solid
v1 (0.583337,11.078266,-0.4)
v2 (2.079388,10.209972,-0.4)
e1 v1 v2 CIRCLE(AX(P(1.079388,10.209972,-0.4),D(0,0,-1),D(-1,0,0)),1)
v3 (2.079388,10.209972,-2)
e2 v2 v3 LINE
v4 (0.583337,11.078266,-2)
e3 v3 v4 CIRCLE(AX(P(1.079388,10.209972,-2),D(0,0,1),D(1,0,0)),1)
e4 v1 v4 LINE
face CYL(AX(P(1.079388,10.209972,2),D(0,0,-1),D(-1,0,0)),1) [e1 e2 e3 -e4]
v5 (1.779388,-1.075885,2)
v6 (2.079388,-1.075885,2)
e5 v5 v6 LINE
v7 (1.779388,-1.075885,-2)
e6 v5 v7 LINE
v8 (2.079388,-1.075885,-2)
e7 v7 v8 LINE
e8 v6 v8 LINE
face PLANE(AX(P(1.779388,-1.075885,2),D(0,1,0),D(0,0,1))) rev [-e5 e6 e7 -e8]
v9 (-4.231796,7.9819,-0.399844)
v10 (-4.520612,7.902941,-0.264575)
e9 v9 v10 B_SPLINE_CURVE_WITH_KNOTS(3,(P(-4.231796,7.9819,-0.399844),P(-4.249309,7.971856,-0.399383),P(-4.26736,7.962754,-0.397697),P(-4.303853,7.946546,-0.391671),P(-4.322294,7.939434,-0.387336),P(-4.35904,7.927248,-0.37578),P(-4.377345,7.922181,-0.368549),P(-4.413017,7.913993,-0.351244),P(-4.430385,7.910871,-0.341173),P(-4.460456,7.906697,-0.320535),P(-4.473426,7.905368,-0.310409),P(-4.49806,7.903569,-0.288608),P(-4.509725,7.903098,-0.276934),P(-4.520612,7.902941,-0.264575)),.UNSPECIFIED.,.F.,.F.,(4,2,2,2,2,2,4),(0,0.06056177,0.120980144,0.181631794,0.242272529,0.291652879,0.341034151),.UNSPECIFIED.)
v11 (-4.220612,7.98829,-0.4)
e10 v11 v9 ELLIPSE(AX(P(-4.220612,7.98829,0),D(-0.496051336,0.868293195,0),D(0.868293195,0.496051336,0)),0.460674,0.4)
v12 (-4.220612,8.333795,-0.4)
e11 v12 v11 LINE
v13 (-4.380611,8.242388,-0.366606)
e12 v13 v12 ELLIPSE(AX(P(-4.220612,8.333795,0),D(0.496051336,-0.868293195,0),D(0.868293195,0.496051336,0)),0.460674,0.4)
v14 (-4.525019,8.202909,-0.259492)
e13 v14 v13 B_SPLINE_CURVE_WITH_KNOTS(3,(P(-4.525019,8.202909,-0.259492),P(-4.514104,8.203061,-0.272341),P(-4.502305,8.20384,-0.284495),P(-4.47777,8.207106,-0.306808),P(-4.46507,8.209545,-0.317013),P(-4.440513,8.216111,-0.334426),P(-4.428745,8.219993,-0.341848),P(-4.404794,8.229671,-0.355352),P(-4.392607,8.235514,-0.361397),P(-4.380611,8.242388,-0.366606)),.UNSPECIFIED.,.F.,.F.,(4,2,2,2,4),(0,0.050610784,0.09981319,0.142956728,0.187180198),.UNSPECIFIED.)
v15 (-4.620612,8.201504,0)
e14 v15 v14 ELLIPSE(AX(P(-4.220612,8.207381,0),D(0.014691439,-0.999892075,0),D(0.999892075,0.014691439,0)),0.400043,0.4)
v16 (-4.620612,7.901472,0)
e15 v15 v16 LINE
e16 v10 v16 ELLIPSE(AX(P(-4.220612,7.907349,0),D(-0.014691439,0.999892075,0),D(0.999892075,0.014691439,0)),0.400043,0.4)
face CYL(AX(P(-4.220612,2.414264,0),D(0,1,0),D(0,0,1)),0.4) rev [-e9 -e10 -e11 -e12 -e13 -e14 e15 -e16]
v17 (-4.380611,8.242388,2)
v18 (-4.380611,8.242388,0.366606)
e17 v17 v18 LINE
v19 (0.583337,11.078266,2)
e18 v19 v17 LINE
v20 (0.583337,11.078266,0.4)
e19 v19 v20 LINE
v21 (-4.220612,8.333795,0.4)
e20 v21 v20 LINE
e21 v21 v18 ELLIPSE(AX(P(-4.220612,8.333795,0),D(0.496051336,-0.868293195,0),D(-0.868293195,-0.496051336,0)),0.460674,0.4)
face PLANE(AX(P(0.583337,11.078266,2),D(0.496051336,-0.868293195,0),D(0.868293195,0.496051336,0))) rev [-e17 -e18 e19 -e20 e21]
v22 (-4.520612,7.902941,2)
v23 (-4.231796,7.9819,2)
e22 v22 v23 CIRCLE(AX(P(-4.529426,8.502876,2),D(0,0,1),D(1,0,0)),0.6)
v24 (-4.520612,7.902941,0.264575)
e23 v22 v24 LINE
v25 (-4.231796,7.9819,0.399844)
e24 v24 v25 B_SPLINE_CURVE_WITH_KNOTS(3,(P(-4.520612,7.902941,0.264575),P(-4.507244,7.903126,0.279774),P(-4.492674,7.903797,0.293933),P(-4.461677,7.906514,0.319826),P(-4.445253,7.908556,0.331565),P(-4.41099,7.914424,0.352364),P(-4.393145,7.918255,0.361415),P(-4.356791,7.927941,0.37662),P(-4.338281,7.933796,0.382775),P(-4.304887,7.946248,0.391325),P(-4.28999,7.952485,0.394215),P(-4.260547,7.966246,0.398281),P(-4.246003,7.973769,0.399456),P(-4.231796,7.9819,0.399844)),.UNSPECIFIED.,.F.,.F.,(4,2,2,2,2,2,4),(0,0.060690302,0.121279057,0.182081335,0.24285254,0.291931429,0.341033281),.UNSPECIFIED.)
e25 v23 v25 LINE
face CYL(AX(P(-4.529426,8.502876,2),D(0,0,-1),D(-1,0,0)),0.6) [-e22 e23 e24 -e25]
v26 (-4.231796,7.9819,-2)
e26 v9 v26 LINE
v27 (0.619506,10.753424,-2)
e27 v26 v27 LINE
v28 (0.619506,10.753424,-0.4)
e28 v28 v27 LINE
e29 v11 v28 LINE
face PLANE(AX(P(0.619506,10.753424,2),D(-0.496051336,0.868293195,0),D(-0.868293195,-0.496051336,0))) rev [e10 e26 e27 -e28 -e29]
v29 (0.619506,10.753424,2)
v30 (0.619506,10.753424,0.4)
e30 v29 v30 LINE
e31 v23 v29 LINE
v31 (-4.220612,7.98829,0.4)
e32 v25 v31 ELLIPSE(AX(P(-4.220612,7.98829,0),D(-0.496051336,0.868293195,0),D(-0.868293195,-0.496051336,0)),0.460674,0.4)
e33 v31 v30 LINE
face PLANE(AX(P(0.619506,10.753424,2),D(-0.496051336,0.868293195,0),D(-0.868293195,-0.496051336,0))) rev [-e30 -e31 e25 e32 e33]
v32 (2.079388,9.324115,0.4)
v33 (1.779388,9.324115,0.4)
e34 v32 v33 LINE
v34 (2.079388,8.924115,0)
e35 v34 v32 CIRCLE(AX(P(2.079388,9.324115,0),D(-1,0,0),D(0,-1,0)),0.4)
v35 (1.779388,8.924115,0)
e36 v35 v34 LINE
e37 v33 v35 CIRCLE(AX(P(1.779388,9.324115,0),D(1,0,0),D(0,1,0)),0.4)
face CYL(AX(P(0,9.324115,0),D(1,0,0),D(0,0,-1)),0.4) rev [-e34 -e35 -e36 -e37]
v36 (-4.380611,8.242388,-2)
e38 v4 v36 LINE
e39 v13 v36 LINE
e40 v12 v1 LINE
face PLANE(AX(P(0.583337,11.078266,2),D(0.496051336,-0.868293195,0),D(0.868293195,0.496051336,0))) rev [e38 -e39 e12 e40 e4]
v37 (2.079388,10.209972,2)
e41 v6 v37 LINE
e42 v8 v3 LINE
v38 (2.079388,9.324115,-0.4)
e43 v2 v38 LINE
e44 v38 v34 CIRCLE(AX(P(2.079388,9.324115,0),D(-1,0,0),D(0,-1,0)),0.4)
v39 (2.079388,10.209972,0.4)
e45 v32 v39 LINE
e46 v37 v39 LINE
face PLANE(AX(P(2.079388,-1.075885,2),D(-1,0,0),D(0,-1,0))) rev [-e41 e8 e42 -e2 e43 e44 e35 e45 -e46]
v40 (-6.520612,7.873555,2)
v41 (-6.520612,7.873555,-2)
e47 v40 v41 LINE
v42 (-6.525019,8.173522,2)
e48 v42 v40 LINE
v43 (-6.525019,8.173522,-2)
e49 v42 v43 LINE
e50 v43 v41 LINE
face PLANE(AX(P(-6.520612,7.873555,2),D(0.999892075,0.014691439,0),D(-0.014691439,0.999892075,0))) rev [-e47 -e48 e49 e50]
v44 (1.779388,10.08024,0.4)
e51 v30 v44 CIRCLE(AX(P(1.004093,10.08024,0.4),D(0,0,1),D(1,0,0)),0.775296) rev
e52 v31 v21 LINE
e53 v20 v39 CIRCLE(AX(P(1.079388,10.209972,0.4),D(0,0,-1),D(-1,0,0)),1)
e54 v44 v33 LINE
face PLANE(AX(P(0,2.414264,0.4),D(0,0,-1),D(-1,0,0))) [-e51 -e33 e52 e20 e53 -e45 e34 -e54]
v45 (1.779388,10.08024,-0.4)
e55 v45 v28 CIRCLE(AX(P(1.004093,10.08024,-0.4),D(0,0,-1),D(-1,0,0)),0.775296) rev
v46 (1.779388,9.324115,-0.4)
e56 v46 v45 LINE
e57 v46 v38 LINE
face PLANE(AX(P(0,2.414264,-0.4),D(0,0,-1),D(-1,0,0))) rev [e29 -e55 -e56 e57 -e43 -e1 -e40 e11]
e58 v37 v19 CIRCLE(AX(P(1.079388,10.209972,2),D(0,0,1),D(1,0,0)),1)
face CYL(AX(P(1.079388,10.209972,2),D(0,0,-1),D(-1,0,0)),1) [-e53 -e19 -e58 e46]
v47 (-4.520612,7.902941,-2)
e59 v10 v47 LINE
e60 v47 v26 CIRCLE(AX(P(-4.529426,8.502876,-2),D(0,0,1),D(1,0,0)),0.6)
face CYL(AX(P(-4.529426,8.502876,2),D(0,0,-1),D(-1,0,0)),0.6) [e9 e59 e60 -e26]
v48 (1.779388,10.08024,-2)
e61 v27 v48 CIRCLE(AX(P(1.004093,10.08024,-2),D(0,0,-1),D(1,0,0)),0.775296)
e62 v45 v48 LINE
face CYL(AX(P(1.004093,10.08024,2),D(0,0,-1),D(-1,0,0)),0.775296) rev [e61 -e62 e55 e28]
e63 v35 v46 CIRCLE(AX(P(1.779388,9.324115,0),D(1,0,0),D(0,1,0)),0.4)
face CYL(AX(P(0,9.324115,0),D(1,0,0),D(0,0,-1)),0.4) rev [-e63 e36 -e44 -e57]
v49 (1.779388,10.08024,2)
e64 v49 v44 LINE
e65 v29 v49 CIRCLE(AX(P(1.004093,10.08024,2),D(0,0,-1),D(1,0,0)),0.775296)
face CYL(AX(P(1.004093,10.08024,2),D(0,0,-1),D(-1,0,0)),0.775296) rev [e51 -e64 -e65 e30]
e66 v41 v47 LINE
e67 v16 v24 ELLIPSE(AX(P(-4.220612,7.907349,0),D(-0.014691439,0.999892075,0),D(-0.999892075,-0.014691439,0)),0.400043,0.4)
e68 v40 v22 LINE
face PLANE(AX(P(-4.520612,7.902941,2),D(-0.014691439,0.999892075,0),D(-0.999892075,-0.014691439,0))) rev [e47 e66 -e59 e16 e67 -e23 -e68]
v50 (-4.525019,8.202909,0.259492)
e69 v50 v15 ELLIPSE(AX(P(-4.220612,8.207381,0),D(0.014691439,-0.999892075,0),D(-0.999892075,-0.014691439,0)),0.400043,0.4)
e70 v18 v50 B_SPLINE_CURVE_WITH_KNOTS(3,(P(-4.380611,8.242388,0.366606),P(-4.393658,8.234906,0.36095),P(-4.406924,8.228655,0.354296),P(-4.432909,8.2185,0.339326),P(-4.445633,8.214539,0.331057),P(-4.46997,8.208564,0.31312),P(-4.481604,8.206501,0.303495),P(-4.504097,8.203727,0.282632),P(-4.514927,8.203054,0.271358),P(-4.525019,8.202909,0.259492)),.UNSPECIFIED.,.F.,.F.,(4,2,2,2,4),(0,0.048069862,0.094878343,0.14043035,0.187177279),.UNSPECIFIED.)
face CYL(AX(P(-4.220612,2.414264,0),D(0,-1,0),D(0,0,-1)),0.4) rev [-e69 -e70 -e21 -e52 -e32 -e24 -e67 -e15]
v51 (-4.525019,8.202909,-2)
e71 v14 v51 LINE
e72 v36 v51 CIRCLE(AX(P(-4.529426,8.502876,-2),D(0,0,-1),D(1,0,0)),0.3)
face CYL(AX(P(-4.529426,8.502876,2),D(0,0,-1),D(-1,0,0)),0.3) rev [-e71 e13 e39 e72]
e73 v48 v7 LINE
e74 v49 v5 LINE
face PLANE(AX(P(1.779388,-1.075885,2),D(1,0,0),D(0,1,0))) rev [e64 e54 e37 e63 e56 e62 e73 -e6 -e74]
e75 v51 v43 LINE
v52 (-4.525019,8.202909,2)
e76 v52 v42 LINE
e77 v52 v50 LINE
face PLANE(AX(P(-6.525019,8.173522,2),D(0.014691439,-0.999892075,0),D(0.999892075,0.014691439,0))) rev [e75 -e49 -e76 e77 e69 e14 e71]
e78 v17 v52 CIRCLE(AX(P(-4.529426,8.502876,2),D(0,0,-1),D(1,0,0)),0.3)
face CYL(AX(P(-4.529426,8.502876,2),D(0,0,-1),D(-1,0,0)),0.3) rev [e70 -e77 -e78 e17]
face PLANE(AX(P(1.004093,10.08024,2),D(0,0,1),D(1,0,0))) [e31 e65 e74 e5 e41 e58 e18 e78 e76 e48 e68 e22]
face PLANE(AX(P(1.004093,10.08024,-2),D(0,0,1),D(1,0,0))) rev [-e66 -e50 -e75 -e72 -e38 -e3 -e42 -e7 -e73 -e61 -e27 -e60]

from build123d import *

# Parameters (mm, degrees)
BOSS_EXTRUDE1_DEPTH              = 2
CUT_EXTRUDE2_REACH               = 30.124
CUT_EXTRUDE2_START               = 15
SKETCH3_W                        = 6.7
SKETCH3_H                        = 0.8
CUT_EXTRUDE3_REACH               = 23.248
CUT_EXTRUDE3_OFFSET_FROM_SURFACE = 10
SKETCH4_W                        = 2.662765864
SKETCH4_H                        = 0.8
FILLET1_R                        = 0.4


with BuildPart() as part:
    # Sketch1 → Boss-Extrude1 (new, symmetric)
    with BuildSketch(Plane.XY):
        with BuildLine():
            Line((1.77938838, -1.075884724), (2.07938838, -1.075884724))
            Line((2.07938838, -1.075884724), (2.07938838, 10.209972433))
            ThreePointArc((2.07938838, 10.209972433), (1.58135883, 11.074857205), (0.583337044, 11.078265628))
            Line((0.583337044, 11.078265628), (-4.380611082, 8.242388166))
            ThreePointArc((-4.380611082, 8.242388166), (-4.45031283, 8.2134957), (-4.525019051, 8.202908502))
            Line((-4.525019051, 8.202908502), (-6.525019051, 8.173522453))
            Line((-6.525019051, 8.173522453), (-6.52061162, 7.873554831))
            Line((-6.52061162, 7.873554831), (-4.52061162, 7.902940879))
            ThreePointArc((-4.52061162, 7.902940879), (-4.371199177, 7.924115276), (-4.231795681, 7.981900208))
            Line((-4.231795681, 7.981900208), (0.619506411, 10.753423582))
            ThreePointArc((0.619506411, 10.753423582), (1.393268277, 10.750781047), (1.77938838, 10.080239717))
            Line((1.77938838, 10.080239717), (1.77938838, -1.075884724))
        make_face()
    extrude(amount=BOSS_EXTRUDE1_DEPTH, both=True)

    # Cut-Extrude2: up to this plane
    cut_extrude2_end = Plane(origin=(0.619506411, 10.753423582, 2), z_dir=(-0.49605133620388303, 0.8682931946355115, 0))
    # Sketch3 → Cut-Extrude2 (cut, up to the surface)
    with BuildSketch(Plane(origin=(0, 0, 0), x_dir=(1, 0, 0), z_dir=(0, 1, 0)).offset(CUT_EXTRUDE2_START), mode=Mode.PRIVATE) as cut_extrude2_sk1:
        with Locations((-1.27061162, 0)):
            Rectangle(SKETCH3_W, SKETCH3_H)
    cut_extrude2_tool1 = split(extrude(cut_extrude2_sk1.sketch, amount=-CUT_EXTRUDE2_REACH, mode=Mode.PRIVATE), bisect_by=cut_extrude2_end, keep=Keep.BOTH, mode=Mode.PRIVATE)
    add(cut_extrude2_tool1.solids().sort_by_distance((-1.270612, 15, 0))[0], mode=Mode.SUBTRACT)

    # Cut-Extrude3: up to this face of the body (flat: up to its plane, moved by the offset)
    cut_extrude3_end = Plane(part.part.faces().sort_by_distance((1.92938838, -1.075884724, 0))[0]).offset(-CUT_EXTRUDE3_OFFSET_FROM_SURFACE)
    # Sketch4 → Cut-Extrude3 (cut, up to the picked face)
    with BuildSketch(Plane(origin=(-4.479253053, 7.840529112, 0), x_dir=(0.8682931946355115, 0.49605133620388303, 0), z_dir=(-0.49605133620388303, 0.8682931946355115, 0)), mode=Mode.PRIVATE) as cut_extrude3_sk1:
        with Locations((7.203546269, 0)):
            Rectangle(SKETCH4_W, SKETCH4_H)
    cut_extrude3_tool1 = split(extrude(cut_extrude3_sk1.sketch, amount=-CUT_EXTRUDE3_REACH, mode=Mode.PRIVATE), bisect_by=cut_extrude3_end, keep=Keep.BOTH, mode=Mode.PRIVATE)
    add(cut_extrude3_tool1.solids().sort_by(Axis((1.775537, 11.413858, 0), (0.49605133620388303, -0.8682931946355115, 0)))[0], mode=Mode.SUBTRACT)

    # Fillet1
    fillet1_edges = [part.edges().sort_by_distance(p)[0] for p in [
        (-4.62061162, 8.051487767, -0.4),
        (-4.62061162, 8.051487767, 0.4),
        (1.92938838, 8.924115276, -0.4),
        (1.92938838, 8.924115276, 0.4),
    ]]
    fillet(fillet1_edges, radius=FILLET1_R - 0.0001)  # a hair under: the kernel refuses the full size


solid = part.part
